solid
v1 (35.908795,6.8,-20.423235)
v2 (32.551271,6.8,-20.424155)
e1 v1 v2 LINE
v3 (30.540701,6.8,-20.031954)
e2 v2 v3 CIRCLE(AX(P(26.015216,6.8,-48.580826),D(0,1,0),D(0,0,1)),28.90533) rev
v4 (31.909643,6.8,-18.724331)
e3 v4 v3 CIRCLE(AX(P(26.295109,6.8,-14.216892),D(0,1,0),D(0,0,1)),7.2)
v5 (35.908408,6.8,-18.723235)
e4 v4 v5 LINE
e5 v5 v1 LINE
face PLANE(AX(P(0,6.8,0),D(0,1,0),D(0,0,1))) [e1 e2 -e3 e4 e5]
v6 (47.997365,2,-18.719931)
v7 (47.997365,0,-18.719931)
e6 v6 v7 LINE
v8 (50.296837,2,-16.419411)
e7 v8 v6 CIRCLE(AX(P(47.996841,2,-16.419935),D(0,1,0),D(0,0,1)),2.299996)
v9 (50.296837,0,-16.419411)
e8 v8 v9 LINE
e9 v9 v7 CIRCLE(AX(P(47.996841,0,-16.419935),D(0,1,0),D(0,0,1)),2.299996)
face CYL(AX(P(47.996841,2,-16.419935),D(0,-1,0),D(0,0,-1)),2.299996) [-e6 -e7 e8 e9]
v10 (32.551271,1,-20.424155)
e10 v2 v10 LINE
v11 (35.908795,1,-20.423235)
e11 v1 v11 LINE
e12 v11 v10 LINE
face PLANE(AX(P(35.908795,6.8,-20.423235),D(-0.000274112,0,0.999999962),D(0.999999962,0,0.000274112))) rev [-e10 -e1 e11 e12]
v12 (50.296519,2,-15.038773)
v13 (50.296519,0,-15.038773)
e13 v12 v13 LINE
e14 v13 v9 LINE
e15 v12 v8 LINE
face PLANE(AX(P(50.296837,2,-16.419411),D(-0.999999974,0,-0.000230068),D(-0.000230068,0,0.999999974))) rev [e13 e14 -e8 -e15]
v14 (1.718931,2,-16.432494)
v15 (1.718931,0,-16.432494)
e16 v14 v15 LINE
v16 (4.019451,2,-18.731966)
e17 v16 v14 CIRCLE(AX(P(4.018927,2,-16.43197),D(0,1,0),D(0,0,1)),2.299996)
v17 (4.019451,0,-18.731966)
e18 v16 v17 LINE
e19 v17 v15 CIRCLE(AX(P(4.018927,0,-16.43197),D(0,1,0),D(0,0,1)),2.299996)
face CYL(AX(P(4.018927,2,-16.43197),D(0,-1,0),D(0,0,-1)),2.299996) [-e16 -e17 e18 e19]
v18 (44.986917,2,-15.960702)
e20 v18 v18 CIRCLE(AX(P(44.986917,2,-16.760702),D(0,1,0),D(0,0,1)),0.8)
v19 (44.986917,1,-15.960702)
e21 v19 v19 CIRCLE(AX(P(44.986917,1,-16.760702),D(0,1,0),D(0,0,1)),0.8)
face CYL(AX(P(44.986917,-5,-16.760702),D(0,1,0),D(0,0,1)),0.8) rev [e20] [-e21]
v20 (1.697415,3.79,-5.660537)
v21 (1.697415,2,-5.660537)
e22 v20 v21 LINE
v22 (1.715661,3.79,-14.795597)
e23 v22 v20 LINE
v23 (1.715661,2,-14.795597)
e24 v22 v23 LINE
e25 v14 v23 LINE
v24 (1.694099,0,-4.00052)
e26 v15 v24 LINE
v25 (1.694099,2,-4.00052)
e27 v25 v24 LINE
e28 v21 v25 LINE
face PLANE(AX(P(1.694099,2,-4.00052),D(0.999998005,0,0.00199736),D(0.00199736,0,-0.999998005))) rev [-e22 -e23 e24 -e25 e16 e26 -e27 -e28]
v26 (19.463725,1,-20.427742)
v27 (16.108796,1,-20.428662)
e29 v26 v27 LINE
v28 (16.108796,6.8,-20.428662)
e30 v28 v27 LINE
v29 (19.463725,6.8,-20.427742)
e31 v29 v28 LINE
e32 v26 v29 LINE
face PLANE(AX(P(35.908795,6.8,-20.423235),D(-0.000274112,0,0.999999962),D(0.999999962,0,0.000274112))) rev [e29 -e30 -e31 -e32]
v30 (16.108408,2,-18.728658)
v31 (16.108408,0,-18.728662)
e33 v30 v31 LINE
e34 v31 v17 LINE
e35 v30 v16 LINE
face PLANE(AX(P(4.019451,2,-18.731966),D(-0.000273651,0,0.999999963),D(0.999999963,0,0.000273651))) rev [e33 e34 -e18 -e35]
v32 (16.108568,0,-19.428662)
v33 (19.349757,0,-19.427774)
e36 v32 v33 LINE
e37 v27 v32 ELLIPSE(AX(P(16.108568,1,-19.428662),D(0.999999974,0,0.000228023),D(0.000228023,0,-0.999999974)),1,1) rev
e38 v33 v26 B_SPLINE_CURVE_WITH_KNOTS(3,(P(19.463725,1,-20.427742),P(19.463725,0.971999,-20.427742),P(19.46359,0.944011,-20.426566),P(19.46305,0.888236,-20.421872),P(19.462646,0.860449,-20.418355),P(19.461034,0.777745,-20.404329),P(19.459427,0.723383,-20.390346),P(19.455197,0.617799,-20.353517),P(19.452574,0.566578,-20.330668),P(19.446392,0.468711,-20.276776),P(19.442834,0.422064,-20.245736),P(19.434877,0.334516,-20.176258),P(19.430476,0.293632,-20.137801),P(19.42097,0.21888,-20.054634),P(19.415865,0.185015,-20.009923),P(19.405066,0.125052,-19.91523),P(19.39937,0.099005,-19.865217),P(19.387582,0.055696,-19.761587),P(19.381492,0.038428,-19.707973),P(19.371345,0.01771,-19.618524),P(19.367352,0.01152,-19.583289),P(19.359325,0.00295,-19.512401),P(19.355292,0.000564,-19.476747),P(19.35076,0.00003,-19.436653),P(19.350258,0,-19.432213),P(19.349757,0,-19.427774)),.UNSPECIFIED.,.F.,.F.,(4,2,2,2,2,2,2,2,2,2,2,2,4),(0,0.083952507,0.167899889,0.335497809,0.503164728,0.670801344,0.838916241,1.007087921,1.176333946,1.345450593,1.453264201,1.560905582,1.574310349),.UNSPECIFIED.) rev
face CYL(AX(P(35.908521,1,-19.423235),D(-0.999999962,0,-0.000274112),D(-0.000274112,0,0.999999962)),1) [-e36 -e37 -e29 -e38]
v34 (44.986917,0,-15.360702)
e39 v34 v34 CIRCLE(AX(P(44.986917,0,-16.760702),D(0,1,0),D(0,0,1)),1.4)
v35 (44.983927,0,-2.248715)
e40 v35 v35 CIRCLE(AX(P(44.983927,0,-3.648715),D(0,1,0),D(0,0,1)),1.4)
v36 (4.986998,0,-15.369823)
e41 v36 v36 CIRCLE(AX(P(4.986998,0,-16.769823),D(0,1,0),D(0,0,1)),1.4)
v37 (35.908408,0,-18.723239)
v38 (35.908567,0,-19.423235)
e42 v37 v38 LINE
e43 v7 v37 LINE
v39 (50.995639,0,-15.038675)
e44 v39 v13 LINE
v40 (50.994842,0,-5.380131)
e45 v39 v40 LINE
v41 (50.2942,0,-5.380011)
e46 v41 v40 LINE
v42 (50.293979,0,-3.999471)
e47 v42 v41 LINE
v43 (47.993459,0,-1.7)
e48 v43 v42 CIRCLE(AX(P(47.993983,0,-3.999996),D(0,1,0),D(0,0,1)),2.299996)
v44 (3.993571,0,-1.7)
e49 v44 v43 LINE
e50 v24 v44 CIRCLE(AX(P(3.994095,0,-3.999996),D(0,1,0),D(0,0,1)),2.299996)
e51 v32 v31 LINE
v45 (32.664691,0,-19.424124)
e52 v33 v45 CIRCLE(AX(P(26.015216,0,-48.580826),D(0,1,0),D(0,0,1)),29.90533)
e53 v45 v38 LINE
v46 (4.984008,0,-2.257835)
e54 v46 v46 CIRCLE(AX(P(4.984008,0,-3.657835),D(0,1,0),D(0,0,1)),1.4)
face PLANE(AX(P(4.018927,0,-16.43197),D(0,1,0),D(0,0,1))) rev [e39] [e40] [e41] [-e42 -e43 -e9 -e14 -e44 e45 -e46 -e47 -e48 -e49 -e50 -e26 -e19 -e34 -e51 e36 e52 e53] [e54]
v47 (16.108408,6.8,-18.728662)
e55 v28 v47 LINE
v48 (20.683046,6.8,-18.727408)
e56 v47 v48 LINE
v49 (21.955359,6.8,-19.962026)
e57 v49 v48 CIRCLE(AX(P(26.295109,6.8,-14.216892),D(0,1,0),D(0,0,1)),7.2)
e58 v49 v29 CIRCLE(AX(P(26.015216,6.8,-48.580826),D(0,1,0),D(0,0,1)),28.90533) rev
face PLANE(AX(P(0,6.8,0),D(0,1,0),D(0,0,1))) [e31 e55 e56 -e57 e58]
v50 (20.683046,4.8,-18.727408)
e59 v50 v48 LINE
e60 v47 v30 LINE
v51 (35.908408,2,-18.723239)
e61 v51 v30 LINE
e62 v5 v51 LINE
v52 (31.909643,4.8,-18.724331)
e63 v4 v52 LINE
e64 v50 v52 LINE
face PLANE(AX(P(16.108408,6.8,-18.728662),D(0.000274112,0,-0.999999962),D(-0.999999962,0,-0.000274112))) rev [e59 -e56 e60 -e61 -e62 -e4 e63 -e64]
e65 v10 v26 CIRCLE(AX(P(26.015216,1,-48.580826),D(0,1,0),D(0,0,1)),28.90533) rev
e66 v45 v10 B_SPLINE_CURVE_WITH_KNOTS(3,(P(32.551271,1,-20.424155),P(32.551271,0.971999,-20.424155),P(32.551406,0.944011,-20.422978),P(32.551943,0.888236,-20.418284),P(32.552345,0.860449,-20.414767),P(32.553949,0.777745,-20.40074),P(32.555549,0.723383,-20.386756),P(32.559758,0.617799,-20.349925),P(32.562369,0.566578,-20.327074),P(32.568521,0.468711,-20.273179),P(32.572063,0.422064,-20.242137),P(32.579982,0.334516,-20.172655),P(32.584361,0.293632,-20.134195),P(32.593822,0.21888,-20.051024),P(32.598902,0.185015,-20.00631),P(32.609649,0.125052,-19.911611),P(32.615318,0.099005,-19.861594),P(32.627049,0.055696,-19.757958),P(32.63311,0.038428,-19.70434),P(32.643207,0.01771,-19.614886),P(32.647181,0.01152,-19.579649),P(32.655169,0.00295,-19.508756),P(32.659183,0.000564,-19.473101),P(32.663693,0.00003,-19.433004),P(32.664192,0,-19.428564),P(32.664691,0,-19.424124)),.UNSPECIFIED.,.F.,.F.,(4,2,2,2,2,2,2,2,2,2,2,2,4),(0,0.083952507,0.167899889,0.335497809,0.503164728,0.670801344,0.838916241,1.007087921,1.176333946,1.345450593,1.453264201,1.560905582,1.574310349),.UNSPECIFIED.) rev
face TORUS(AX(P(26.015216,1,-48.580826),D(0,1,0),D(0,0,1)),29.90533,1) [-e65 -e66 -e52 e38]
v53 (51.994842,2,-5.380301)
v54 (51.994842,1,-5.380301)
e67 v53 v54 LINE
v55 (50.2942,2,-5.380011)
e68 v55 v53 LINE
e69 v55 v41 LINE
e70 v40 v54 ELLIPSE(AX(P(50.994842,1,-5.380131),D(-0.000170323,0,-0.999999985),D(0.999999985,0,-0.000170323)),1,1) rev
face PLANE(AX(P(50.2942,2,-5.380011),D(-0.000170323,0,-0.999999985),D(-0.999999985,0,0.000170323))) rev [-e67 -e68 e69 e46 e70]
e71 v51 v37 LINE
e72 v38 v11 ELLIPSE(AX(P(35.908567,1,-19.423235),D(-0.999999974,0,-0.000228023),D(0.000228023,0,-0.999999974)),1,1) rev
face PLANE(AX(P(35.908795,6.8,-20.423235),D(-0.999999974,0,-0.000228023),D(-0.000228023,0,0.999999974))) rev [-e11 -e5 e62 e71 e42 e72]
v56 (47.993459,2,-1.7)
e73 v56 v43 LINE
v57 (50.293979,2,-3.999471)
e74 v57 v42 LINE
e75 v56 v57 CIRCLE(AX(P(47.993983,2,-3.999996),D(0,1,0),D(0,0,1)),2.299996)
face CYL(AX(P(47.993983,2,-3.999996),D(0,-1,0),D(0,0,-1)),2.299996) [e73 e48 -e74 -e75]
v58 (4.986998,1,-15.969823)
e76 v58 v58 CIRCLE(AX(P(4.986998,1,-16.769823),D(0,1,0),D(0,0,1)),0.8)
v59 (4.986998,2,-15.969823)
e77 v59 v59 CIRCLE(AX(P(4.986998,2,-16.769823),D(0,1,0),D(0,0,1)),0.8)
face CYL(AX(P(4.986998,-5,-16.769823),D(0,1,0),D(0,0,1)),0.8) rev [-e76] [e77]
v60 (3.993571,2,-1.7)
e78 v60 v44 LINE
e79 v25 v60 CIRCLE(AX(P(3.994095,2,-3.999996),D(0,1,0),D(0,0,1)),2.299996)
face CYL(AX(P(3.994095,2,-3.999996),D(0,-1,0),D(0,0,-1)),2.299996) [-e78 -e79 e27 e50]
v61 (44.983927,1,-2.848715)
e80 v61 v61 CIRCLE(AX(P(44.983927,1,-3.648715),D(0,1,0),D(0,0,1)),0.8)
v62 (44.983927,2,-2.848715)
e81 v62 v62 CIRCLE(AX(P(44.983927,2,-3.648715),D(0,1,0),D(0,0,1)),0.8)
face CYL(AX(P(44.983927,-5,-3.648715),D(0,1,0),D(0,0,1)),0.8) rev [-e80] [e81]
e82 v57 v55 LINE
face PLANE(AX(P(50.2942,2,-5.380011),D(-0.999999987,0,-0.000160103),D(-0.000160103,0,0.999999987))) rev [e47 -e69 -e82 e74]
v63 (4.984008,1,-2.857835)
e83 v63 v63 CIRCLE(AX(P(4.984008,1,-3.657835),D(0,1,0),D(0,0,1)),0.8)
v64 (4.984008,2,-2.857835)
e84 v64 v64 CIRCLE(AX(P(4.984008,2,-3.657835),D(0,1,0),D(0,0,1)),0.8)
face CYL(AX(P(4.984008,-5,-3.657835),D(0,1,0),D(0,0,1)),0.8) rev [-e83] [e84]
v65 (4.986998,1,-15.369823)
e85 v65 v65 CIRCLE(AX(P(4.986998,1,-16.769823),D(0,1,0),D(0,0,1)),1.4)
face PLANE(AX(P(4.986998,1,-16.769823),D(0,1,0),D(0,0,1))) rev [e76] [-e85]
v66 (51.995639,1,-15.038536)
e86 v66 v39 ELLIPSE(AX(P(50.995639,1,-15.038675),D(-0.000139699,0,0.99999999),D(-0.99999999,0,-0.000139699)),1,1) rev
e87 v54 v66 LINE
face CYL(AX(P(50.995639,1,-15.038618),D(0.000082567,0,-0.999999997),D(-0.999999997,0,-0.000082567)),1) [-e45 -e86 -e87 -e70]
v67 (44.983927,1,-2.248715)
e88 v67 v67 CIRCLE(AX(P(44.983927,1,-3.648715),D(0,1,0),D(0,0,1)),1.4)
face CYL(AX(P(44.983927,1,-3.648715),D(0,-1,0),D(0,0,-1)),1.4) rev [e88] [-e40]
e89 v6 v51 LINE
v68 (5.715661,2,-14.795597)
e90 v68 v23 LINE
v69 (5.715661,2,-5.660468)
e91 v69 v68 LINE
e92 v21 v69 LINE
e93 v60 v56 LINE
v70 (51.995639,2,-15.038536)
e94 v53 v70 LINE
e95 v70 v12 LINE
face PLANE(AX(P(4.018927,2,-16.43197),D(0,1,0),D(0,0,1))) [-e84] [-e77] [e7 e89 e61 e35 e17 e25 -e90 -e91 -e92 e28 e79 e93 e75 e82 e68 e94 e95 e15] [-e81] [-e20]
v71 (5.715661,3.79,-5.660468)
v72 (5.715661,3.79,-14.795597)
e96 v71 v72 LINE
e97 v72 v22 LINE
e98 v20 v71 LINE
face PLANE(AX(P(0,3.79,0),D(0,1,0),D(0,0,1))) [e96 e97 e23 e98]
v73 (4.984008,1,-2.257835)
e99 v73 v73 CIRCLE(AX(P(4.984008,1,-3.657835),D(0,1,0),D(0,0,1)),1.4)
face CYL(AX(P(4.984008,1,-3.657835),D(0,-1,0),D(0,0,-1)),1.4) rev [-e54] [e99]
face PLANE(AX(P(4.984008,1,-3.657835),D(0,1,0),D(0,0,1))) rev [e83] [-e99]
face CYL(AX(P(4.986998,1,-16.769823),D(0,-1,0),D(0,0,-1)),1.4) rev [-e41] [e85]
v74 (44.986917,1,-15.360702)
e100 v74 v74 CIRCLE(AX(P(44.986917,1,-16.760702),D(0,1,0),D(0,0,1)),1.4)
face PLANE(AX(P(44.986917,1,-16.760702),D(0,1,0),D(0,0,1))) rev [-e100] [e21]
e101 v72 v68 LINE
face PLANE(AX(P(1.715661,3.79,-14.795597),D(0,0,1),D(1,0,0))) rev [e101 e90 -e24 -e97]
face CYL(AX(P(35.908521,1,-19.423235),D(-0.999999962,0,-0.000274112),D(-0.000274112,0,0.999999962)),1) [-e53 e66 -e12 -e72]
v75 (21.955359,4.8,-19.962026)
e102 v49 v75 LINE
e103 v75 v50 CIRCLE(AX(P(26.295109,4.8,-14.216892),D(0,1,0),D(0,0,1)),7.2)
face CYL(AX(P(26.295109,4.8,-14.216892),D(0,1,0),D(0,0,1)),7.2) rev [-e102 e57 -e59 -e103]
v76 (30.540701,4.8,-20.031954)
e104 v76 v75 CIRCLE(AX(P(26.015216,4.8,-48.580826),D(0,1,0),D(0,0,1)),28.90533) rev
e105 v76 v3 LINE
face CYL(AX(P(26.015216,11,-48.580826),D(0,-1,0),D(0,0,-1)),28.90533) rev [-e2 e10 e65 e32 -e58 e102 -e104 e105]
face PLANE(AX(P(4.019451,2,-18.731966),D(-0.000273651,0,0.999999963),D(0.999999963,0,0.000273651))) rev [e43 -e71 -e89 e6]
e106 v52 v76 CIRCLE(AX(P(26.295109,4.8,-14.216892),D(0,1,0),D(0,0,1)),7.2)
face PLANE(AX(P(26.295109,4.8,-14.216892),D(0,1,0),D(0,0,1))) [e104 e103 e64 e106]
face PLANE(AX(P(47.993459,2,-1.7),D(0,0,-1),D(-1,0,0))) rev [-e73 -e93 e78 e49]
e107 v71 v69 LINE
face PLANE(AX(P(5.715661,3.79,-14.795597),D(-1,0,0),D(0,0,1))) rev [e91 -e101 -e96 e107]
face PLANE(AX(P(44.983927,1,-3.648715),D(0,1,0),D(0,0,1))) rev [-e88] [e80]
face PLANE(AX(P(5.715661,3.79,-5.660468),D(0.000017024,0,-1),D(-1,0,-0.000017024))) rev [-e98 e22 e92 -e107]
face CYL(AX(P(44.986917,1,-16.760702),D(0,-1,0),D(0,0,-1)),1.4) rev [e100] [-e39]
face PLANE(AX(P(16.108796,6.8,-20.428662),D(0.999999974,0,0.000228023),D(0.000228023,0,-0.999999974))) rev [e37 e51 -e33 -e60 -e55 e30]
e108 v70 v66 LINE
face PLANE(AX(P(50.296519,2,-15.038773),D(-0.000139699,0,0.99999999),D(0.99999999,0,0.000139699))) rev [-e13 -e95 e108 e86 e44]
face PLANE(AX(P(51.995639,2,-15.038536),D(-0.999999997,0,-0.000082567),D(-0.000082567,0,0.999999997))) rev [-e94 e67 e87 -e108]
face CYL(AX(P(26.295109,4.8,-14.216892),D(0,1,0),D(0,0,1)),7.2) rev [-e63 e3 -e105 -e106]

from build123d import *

# Parameters (mm, degrees)
EXTRUDE_1_DEPTH          = 2
SKETCH_3_R               = 1.4
CUT_EXTRUDE_2_DEPTH      = 1
SKETCH_4_R               = 0.8
CUT_EXTRUDE_3_DEPTH      = 7
FILLET_1_R               = 1
EXTRUDE_2_DEPTH          = 1.79
EXTRUDE_3_DEPTH          = 6.8
CUT_EXTRUDE_4_DEPTH      = 2
CUT_EXTRUDE_5_DEPTH      = 9
CUT_EXTRUDE_5_DEPTH_BACK = 5
SKETCH_8_R               = 28.905330341
FILLET_2_R               = 1


with BuildPart() as part:
    # 草图1 → 凸台-拉伸1 (new body)
    with BuildSketch(Plane(origin=(0, 0, 0), x_dir=(1, 0, 0), z_dir=(0, 1, 0))):
        with BuildLine():
            Line((50.296518896, 15.038773117), (51.995638969, 15.038535751))
            Line((51.995638969, 15.038535751), (51.99484152, 5.380301086))
            Line((51.99484152, 5.380301086), (50.29420013, 5.380011427))
            Line((50.29420013, 5.380011427), (50.293979101, 3.999471495))
            ThreePointArc((50.293979101, 3.999471495), (49.619955043, 2.373282378), (47.993458708, 1.700000008))
            Line((47.993458708, 1.700000008), (3.993570964, 1.700000008))
            ThreePointArc((3.993570964, 1.700000008), (2.367381847, 2.374024066), (1.694099477, 4.000520401))
            Line((1.694099477, 4.000520401), (1.718930657, 16.432494262))
            ThreePointArc((1.718930657, 16.432494262), (2.392954716, 18.058683379), (4.01945105, 18.731965749))
            Line((4.01945105, 18.731965749), (47.997365049, 18.71993116))
            ThreePointArc((47.997365049, 18.71993116), (49.623554167, 18.045907101), (50.296836537, 16.419410767))
            Line((50.296836537, 16.419410767), (50.296518896, 15.038773117))
        make_face()
    extrude(amount=EXTRUDE_1_DEPTH)

    # 草图3 → 切除-拉伸2 (cut)
    with BuildSketch(Plane(origin=(0, 0, 0), x_dir=(1, 0, 0), z_dir=(0, 1, 0))):
        with Locations((4.986997661, 16.769823075)):
            Circle(SKETCH_3_R)
        with Locations((4.984007822, 3.657835416)):
            Circle(SKETCH_3_R)
        with Locations((44.986916621, 16.760702161)):
            Circle(SKETCH_3_R)
        with Locations((44.983926782, 3.648714502)):
            Circle(SKETCH_3_R)
    extrude(amount=CUT_EXTRUDE_2_DEPTH, mode=Mode.SUBTRACT)

    # 草图4 → 切除-拉伸3 (cut)
    with BuildSketch(Plane(origin=(0, 2, 0), x_dir=(1, 0, 0), z_dir=(0, 1, 0))):
        with Locations((44.983926782, 3.648714502)):
            Circle(SKETCH_4_R)
        with Locations((44.986916621, 16.760702161)):
            Circle(SKETCH_4_R)
        with Locations((4.984007822, 3.657835416)):
            Circle(SKETCH_4_R)
        with Locations((4.986997661, 16.769823075)):
            Circle(SKETCH_4_R)
    extrude(amount=-CUT_EXTRUDE_3_DEPTH, mode=Mode.SUBTRACT)

    # 圆角1
    fillet_1_edges = [part.edges().sort_by_distance(p)[0] for p in [
        (51.995240244, 0, -10.209418418),
    ]]
    fillet(fillet_1_edges, radius=FILLET_1_R)

    # 草图5 → 凸台-拉伸2 (add)
    with BuildSketch(Plane(origin=(0, 2, 0), x_dir=(1, 0, 0), z_dir=(0, 1, 0))):
        Polygon((1.715661177, 14.795597045), (5.715661177, 14.795597045), (5.715661177, 5.660468281), (1.697415134, 5.660536688), align=None)
    extrude(amount=EXTRUDE_2_DEPTH)


with BuildPart() as extrude_3_tool:
    # 草图6 → 凸台-拉伸3 (new body)
    with BuildSketch(Plane(origin=(0, 0, 0), x_dir=(1, 0, 0), z_dir=(0, 1, 0))):
        Polygon((35.908795328, 20.423234707), (35.908407688, 18.723234749), (16.108408411, 18.72866216), (16.108796051, 20.428662118), align=None)
    extrude(amount=EXTRUDE_3_DEPTH)


with BuildPart() as part_1:
    add(part.part)


with BuildPart() as part_2:
    # 凸台-拉伸3: joined with extrude_3_tool
    add(part_1.part.fuse(extrude_3_tool.part, tol=0.00001))

    # 草图7 → 切除-拉伸4 (cut)
    with BuildSketch(Plane(origin=(0, 6.8, 0), x_dir=(1, 0, 0), z_dir=(0, 1, 0))):
        with BuildLine():
            Line((20.454642354, 18.427468236), (32.137878346, 18.424271109))
            ThreePointArc((32.137878346, 18.424271109), (26.297078845, 21.416891462), (20.454642354, 18.427468236))
        make_face()
    extrude(amount=-CUT_EXTRUDE_4_DEPTH, mode=Mode.SUBTRACT)

    # 草图8 → 切除-拉伸5 (cut, two sides: drawn at the far end of the back side and taken through both)
    with BuildSketch(Plane(origin=(0, 2, 0), x_dir=(1, 0, 0), z_dir=(0, 1, 0)).offset(-CUT_EXTRUDE_5_DEPTH_BACK)):
        with Locations((26.015215658, 48.580825692)):
            Circle(SKETCH_8_R)
    extrude(amount=CUT_EXTRUDE_5_DEPTH + CUT_EXTRUDE_5_DEPTH_BACK, mode=Mode.SUBTRACT)

    # 圆角2
    fillet_2_edges = [part_2.edges().sort_by_distance(p)[0] for p in [
        (34.230033191, 0, -20.423694875),
        (17.786260576, 0, -20.428202305),
        (26.00729237, 0, -19.675496437),
    ]]
    fillet(fillet_2_edges, radius=FILLET_2_R)


solid = part_2.part
